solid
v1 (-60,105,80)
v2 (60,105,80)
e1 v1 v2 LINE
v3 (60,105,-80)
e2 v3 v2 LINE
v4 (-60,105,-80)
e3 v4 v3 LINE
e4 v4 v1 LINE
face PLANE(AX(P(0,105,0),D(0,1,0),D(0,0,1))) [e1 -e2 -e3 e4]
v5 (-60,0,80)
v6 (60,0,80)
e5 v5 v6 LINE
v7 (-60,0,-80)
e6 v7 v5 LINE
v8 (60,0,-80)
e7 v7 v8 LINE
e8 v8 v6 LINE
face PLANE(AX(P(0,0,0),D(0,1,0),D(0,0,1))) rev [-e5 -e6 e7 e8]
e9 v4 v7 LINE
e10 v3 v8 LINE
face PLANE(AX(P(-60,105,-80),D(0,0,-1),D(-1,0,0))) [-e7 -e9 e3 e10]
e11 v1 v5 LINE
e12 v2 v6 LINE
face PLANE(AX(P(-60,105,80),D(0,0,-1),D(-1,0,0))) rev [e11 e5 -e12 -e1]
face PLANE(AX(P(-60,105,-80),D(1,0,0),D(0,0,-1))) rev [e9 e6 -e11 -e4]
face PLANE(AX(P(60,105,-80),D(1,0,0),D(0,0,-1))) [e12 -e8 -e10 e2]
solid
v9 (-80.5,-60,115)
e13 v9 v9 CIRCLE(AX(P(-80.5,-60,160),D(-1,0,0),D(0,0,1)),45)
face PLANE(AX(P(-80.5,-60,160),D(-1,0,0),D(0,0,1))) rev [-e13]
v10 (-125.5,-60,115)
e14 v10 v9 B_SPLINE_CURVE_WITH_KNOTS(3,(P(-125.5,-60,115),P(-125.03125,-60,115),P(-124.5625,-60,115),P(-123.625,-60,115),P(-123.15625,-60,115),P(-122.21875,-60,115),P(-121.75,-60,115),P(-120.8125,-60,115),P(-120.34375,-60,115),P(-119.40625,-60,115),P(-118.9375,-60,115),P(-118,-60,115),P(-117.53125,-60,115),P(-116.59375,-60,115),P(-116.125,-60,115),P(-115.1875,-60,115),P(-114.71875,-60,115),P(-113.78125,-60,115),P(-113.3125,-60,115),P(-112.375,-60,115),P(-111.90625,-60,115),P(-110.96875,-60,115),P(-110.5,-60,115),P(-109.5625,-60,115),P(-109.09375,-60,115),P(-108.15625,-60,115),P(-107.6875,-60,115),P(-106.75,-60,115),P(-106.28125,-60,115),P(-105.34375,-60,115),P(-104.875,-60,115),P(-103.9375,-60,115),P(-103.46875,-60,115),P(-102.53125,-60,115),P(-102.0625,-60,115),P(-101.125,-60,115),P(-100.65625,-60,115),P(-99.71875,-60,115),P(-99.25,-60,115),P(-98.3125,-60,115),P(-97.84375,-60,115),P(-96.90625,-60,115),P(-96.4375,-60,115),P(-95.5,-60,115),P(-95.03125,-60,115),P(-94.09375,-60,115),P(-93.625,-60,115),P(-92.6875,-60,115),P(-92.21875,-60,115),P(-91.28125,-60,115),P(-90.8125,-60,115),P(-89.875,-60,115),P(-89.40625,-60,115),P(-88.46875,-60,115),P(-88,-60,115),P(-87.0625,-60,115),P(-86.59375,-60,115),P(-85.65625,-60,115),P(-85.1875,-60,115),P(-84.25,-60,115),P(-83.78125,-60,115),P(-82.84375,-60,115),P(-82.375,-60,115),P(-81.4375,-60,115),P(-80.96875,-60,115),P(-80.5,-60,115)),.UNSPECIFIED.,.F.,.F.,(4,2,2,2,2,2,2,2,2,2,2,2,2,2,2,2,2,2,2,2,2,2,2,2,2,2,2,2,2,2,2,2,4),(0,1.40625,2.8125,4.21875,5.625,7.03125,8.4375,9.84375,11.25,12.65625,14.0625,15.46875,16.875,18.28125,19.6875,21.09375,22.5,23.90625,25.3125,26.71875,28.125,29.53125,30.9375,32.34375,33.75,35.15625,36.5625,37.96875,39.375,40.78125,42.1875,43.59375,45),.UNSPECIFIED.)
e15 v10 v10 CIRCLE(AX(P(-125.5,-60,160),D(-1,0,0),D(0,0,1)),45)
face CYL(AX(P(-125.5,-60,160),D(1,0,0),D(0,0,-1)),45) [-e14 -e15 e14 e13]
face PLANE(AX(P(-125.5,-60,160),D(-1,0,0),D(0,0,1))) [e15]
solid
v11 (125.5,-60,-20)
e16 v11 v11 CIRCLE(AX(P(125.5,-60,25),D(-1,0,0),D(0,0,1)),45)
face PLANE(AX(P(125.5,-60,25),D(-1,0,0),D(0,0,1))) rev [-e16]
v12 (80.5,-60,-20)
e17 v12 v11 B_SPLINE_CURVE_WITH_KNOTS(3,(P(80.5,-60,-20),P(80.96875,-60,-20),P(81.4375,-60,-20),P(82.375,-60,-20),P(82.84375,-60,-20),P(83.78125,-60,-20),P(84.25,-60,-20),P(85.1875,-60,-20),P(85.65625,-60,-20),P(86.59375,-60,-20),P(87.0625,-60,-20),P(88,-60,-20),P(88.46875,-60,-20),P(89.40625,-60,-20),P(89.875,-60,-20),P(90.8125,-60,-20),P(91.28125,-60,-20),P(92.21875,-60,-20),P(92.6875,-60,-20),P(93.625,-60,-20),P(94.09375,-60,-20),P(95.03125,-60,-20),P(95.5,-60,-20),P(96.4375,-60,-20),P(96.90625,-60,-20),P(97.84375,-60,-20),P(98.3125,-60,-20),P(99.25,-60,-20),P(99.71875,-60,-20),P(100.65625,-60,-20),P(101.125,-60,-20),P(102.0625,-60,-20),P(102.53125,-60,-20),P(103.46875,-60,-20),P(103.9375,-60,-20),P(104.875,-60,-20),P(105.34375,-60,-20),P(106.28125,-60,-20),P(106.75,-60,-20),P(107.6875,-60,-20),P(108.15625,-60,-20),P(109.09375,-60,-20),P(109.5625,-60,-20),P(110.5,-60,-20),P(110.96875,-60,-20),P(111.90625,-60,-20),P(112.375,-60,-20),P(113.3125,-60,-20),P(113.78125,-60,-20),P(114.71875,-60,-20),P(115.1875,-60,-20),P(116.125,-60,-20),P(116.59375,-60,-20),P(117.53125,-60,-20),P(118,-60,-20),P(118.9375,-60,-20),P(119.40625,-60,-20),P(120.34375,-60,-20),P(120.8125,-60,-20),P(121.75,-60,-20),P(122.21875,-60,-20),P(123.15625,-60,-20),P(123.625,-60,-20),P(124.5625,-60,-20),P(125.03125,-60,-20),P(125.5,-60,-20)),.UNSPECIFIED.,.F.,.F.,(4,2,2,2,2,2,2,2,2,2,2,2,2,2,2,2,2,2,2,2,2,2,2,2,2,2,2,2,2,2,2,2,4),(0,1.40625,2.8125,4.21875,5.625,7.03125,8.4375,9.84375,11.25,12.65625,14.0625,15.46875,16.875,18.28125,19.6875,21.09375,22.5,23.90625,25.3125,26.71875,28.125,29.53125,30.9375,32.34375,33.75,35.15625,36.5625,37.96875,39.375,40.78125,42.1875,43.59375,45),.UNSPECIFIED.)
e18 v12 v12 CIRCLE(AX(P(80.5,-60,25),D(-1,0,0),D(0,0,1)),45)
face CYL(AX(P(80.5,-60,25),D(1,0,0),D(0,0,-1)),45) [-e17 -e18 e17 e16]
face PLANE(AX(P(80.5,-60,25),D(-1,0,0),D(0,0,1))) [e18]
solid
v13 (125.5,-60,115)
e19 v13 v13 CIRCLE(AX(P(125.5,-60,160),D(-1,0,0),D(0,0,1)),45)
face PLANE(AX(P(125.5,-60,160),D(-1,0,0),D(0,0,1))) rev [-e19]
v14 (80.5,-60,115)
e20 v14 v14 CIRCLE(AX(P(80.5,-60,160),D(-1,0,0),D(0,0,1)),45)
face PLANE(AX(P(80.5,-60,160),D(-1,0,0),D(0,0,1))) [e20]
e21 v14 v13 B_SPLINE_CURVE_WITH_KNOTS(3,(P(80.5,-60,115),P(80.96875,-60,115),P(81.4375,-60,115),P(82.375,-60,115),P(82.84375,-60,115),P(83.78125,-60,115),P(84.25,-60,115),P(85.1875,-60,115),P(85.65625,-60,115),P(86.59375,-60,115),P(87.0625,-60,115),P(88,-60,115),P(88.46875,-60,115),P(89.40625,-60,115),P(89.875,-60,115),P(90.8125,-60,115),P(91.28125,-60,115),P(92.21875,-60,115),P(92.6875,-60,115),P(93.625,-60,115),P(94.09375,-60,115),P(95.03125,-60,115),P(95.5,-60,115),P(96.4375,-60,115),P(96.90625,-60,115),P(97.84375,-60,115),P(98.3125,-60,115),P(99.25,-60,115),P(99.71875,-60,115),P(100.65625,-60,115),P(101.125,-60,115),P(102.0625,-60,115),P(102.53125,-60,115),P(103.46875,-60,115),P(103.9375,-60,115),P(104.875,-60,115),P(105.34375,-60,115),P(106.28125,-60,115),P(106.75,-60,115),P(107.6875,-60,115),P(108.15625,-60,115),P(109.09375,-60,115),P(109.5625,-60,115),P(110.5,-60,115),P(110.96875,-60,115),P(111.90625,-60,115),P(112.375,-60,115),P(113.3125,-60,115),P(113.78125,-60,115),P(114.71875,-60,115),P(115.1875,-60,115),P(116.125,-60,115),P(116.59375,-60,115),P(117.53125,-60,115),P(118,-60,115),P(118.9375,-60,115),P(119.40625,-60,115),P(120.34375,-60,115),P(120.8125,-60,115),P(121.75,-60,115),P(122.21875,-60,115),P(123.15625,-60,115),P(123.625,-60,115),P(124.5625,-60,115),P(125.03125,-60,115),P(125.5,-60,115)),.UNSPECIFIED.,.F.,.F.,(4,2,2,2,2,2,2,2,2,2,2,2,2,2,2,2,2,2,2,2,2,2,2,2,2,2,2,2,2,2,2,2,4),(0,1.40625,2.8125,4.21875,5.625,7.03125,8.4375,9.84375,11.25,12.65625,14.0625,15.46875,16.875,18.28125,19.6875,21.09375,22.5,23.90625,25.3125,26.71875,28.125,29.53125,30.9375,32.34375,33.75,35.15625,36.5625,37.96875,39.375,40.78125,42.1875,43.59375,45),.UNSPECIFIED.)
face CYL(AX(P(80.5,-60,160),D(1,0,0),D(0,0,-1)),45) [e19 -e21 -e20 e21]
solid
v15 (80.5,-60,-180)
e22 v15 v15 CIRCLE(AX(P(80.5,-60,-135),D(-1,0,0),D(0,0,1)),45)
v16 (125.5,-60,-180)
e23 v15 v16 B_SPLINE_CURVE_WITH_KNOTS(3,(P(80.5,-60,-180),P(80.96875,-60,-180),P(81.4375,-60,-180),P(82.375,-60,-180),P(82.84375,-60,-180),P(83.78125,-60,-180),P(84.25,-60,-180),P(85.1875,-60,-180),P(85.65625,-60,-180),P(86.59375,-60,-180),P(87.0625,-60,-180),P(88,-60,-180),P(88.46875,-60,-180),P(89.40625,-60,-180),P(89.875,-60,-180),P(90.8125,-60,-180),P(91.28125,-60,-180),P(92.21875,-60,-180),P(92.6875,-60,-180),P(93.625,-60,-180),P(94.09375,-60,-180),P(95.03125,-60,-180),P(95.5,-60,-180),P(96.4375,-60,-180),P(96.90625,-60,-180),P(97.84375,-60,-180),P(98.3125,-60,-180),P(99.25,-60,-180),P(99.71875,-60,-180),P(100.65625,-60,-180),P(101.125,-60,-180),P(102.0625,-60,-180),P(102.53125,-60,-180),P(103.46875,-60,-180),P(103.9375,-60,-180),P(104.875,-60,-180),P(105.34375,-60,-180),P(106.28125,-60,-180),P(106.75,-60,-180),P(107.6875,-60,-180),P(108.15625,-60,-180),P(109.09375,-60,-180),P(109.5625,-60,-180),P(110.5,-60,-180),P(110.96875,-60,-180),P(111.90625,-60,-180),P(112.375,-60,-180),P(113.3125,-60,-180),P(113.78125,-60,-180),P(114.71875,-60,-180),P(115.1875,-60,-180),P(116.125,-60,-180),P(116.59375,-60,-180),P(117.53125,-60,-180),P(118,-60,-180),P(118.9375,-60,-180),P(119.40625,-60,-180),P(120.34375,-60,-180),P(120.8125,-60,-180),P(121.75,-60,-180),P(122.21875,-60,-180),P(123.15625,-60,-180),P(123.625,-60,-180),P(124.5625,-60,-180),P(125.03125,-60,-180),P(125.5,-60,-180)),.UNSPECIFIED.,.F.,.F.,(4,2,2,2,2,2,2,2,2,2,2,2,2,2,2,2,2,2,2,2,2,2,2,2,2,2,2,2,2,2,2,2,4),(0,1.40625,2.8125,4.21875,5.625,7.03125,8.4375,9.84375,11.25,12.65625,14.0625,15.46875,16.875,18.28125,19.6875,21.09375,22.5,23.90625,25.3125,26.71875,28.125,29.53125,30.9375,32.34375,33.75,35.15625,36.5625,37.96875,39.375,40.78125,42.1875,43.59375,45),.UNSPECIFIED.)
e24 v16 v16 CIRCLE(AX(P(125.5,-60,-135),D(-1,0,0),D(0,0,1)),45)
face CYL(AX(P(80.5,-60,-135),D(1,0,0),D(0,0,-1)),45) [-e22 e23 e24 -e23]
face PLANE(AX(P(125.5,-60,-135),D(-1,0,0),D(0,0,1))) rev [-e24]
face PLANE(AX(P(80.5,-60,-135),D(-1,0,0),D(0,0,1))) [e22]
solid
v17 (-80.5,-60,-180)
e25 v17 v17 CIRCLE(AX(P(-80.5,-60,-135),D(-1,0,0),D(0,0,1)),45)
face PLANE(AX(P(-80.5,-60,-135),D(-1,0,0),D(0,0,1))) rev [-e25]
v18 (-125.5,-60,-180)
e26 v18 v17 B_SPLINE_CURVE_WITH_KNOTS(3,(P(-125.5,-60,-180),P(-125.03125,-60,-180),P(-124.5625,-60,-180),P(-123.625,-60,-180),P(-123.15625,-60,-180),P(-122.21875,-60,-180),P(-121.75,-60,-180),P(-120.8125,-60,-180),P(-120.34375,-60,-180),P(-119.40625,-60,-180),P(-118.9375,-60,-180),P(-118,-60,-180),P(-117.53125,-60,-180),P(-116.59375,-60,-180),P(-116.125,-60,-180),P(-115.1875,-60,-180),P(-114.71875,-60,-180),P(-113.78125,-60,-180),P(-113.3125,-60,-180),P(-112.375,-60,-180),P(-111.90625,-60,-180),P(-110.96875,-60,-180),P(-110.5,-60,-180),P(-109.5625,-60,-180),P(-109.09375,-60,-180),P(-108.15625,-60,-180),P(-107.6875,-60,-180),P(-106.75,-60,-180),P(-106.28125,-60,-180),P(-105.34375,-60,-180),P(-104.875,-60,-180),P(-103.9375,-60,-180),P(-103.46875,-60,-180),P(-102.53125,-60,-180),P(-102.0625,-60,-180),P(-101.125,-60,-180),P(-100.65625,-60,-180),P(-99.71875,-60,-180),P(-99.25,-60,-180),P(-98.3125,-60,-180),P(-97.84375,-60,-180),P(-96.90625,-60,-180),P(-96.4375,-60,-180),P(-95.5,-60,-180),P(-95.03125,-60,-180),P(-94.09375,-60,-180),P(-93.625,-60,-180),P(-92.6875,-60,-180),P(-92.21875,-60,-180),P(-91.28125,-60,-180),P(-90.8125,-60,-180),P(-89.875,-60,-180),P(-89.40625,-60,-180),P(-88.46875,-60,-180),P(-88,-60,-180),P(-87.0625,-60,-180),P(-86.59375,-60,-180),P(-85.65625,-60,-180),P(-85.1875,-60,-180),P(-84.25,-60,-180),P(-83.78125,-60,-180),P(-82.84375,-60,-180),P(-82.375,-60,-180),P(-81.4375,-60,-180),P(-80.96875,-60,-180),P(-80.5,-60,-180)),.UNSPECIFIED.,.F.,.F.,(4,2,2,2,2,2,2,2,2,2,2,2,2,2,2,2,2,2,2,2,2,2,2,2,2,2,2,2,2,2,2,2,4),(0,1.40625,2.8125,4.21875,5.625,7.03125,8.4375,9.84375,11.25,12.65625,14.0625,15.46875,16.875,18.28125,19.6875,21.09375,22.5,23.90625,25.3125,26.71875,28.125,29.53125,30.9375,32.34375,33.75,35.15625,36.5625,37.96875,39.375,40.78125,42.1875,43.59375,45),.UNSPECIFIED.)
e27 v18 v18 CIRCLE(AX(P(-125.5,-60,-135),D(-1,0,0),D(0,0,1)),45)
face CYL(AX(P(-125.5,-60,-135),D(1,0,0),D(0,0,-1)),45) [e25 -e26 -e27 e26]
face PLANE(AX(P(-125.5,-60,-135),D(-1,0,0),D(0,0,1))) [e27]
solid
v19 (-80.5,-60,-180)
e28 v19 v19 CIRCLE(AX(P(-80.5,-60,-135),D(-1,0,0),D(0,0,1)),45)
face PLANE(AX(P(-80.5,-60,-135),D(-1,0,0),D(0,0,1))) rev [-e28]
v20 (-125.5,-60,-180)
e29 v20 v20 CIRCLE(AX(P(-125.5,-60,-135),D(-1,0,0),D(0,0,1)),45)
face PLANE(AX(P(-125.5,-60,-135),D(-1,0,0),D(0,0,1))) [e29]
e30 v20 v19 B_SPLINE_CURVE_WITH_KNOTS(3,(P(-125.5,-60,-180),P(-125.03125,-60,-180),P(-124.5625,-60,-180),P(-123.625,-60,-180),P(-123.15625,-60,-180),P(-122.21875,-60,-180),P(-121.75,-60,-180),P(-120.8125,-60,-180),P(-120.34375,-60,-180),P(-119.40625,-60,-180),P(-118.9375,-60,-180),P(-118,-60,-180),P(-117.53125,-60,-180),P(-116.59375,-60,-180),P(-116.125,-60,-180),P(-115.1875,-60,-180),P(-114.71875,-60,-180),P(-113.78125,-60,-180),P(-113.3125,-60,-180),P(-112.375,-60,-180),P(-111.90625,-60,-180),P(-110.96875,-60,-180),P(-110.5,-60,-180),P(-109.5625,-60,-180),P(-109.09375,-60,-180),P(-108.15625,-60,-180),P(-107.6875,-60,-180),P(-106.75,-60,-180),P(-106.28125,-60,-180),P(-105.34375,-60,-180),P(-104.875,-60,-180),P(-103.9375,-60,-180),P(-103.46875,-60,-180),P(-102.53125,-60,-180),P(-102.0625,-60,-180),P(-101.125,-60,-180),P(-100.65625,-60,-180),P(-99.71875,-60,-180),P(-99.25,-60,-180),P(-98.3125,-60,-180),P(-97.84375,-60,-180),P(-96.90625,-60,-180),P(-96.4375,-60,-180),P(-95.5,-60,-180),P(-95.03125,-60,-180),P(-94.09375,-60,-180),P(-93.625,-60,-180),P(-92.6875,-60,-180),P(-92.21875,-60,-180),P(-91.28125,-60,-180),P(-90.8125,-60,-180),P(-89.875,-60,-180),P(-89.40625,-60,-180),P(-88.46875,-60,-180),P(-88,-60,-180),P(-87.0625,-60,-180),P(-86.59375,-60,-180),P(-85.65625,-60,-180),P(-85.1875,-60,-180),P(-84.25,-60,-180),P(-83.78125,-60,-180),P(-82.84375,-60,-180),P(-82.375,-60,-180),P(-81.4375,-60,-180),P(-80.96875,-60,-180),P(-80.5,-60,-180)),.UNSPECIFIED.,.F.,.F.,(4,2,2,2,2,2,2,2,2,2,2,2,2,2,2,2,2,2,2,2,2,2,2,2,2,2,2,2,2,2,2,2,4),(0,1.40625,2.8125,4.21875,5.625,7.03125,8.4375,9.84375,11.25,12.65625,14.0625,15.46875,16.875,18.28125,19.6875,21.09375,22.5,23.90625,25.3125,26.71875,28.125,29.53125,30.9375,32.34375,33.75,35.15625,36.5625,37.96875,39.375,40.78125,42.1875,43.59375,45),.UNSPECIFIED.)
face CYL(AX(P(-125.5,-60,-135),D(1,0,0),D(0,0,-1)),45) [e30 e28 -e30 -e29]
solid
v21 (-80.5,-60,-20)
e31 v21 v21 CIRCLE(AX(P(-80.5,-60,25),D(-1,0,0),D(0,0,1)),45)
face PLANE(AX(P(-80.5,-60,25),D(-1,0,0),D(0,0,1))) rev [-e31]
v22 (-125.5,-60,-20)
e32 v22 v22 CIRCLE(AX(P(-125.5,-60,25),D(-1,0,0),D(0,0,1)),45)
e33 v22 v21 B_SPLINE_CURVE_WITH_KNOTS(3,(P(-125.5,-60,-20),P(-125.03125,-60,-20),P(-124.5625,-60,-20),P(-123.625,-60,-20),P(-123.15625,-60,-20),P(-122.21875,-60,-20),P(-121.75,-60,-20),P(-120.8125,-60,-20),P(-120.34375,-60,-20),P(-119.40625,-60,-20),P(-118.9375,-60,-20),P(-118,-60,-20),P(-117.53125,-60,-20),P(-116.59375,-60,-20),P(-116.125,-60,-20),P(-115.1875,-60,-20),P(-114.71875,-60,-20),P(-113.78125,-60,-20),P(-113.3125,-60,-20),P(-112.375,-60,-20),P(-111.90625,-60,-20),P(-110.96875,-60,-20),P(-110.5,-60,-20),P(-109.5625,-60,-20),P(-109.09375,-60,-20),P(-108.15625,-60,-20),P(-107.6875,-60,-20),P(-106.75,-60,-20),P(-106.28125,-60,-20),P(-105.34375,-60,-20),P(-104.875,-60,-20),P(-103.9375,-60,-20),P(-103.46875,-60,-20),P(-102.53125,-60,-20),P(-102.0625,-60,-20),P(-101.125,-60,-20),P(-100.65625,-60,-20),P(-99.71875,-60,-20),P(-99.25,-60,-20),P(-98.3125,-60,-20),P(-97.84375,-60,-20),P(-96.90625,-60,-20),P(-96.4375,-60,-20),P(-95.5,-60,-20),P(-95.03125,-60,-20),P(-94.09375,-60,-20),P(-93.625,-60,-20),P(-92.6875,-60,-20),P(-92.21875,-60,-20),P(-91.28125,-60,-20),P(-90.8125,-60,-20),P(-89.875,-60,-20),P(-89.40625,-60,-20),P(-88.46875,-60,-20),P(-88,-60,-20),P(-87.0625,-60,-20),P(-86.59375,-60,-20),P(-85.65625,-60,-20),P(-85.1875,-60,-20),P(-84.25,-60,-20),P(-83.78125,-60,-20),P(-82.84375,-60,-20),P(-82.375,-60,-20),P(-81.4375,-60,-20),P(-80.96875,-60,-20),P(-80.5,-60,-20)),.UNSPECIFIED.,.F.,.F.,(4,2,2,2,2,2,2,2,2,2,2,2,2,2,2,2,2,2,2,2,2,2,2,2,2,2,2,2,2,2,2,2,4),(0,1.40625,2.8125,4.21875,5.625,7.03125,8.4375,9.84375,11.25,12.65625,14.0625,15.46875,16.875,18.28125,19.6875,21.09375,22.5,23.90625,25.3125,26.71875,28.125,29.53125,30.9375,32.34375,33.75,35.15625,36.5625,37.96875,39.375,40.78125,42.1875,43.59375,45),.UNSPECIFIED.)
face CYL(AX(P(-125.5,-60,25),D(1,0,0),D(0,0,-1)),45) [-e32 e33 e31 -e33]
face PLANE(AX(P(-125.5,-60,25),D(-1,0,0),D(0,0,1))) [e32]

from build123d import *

# Parameters (mm, degrees)
SKETCH1_W                   = 120
SKETCH1_H                   = 160
BOSS_EXTRUDE1_DEPTH         = 105
SKETCH2_R                   = 45
BOSS_EXTRUDE2_DEPTH         = 22.5
SKETCH_PATTERN2_START       = 80.5
SKETCH_PATTERN2_OUTLINE_R   = 45
SKETCH_PATTERN2_DEPTH       = 45
SKETCH_PATTERN2_2_OUTLINE_R = 45
SKETCH_PATTERN2_2_DEPTH     = 45
SKETCH_PATTERN2_3_OUTLINE_R = 45
SKETCH_PATTERN2_3_DEPTH     = 45
SKETCH_PATTERN2_START_2     = -125.5
SKETCH_PATTERN2_4_OUTLINE_R = 45
SKETCH_PATTERN2_4_DEPTH     = 45
SKETCH_PATTERN2_5_OUTLINE_R = 45
SKETCH_PATTERN2_5_DEPTH     = 45
SKETCH_PATTERN2_6_OUTLINE_R = 45
SKETCH_PATTERN2_6_DEPTH     = 45


# Read off the part's stored shape, not the designer's step: Sketch-Pattern2
with BuildPart() as part:
    # Sketch1 → Boss-Extrude1 (new body)
    with BuildSketch(Plane(origin=(0, 0, 0), x_dir=(1, 0, 0), z_dir=(0, 1, 0))):
        Rectangle(SKETCH1_W, SKETCH1_H)
    extrude(amount=BOSS_EXTRUDE1_DEPTH)


with BuildPart() as body_2:
    # Sketch2 → Boss-Extrude2 (new, symmetric)
    with BuildSketch(Plane.ZY.offset(103)):
        with Locations(Location((-135, -60, 0), (0, 0, 180))):
            Circle(SKETCH2_R)
    extrude(amount=BOSS_EXTRUDE2_DEPTH, both=True)


with BuildPart() as body_3:
    # Sketch-Pattern2 outline → Sketch-Pattern2 (new body)
    with BuildSketch(Plane.YZ.offset(SKETCH_PATTERN2_START)):
        with Locations((-60, -135)):
            Circle(SKETCH_PATTERN2_OUTLINE_R)
    extrude(amount=SKETCH_PATTERN2_DEPTH)


with BuildPart() as body_4:
    # Sketch-Pattern2 2 outline → Sketch-Pattern2 2 (new body)
    with BuildSketch(Plane.YZ.offset(SKETCH_PATTERN2_START)):
        with Locations((-60, 25)):
            Circle(SKETCH_PATTERN2_2_OUTLINE_R)
    extrude(amount=SKETCH_PATTERN2_2_DEPTH)


with BuildPart() as body_5:
    # Sketch-Pattern2 3 outline → Sketch-Pattern2 3 (new body)
    with BuildSketch(Plane.YZ.offset(SKETCH_PATTERN2_START)):
        with Locations((-60, 160)):
            Circle(SKETCH_PATTERN2_3_OUTLINE_R)
    extrude(amount=SKETCH_PATTERN2_3_DEPTH)


with BuildPart() as body_6:
    # Sketch-Pattern2 4 outline → Sketch-Pattern2 4 (new body)
    with BuildSketch(Plane.YZ.offset(SKETCH_PATTERN2_START_2)):
        with Locations((-60, 160)):
            Circle(SKETCH_PATTERN2_4_OUTLINE_R)
    extrude(amount=SKETCH_PATTERN2_4_DEPTH)


with BuildPart() as body_7:
    # Sketch-Pattern2 5 outline → Sketch-Pattern2 5 (new body)
    with BuildSketch(Plane.YZ.offset(SKETCH_PATTERN2_START_2)):
        with Locations((-60, 25)):
            Circle(SKETCH_PATTERN2_5_OUTLINE_R)
    extrude(amount=SKETCH_PATTERN2_5_DEPTH)


with BuildPart() as body_8:
    # Sketch-Pattern2 6 outline → Sketch-Pattern2 6 (new body)
    with BuildSketch(Plane.YZ.offset(SKETCH_PATTERN2_START_2)):
        with Locations((-60, -135)):
            Circle(SKETCH_PATTERN2_6_OUTLINE_R)
    extrude(amount=SKETCH_PATTERN2_6_DEPTH)


solid = Compound([part.part, body_2.part, body_3.part, body_4.part, body_5.part, body_6.part, body_7.part, body_8.part])
